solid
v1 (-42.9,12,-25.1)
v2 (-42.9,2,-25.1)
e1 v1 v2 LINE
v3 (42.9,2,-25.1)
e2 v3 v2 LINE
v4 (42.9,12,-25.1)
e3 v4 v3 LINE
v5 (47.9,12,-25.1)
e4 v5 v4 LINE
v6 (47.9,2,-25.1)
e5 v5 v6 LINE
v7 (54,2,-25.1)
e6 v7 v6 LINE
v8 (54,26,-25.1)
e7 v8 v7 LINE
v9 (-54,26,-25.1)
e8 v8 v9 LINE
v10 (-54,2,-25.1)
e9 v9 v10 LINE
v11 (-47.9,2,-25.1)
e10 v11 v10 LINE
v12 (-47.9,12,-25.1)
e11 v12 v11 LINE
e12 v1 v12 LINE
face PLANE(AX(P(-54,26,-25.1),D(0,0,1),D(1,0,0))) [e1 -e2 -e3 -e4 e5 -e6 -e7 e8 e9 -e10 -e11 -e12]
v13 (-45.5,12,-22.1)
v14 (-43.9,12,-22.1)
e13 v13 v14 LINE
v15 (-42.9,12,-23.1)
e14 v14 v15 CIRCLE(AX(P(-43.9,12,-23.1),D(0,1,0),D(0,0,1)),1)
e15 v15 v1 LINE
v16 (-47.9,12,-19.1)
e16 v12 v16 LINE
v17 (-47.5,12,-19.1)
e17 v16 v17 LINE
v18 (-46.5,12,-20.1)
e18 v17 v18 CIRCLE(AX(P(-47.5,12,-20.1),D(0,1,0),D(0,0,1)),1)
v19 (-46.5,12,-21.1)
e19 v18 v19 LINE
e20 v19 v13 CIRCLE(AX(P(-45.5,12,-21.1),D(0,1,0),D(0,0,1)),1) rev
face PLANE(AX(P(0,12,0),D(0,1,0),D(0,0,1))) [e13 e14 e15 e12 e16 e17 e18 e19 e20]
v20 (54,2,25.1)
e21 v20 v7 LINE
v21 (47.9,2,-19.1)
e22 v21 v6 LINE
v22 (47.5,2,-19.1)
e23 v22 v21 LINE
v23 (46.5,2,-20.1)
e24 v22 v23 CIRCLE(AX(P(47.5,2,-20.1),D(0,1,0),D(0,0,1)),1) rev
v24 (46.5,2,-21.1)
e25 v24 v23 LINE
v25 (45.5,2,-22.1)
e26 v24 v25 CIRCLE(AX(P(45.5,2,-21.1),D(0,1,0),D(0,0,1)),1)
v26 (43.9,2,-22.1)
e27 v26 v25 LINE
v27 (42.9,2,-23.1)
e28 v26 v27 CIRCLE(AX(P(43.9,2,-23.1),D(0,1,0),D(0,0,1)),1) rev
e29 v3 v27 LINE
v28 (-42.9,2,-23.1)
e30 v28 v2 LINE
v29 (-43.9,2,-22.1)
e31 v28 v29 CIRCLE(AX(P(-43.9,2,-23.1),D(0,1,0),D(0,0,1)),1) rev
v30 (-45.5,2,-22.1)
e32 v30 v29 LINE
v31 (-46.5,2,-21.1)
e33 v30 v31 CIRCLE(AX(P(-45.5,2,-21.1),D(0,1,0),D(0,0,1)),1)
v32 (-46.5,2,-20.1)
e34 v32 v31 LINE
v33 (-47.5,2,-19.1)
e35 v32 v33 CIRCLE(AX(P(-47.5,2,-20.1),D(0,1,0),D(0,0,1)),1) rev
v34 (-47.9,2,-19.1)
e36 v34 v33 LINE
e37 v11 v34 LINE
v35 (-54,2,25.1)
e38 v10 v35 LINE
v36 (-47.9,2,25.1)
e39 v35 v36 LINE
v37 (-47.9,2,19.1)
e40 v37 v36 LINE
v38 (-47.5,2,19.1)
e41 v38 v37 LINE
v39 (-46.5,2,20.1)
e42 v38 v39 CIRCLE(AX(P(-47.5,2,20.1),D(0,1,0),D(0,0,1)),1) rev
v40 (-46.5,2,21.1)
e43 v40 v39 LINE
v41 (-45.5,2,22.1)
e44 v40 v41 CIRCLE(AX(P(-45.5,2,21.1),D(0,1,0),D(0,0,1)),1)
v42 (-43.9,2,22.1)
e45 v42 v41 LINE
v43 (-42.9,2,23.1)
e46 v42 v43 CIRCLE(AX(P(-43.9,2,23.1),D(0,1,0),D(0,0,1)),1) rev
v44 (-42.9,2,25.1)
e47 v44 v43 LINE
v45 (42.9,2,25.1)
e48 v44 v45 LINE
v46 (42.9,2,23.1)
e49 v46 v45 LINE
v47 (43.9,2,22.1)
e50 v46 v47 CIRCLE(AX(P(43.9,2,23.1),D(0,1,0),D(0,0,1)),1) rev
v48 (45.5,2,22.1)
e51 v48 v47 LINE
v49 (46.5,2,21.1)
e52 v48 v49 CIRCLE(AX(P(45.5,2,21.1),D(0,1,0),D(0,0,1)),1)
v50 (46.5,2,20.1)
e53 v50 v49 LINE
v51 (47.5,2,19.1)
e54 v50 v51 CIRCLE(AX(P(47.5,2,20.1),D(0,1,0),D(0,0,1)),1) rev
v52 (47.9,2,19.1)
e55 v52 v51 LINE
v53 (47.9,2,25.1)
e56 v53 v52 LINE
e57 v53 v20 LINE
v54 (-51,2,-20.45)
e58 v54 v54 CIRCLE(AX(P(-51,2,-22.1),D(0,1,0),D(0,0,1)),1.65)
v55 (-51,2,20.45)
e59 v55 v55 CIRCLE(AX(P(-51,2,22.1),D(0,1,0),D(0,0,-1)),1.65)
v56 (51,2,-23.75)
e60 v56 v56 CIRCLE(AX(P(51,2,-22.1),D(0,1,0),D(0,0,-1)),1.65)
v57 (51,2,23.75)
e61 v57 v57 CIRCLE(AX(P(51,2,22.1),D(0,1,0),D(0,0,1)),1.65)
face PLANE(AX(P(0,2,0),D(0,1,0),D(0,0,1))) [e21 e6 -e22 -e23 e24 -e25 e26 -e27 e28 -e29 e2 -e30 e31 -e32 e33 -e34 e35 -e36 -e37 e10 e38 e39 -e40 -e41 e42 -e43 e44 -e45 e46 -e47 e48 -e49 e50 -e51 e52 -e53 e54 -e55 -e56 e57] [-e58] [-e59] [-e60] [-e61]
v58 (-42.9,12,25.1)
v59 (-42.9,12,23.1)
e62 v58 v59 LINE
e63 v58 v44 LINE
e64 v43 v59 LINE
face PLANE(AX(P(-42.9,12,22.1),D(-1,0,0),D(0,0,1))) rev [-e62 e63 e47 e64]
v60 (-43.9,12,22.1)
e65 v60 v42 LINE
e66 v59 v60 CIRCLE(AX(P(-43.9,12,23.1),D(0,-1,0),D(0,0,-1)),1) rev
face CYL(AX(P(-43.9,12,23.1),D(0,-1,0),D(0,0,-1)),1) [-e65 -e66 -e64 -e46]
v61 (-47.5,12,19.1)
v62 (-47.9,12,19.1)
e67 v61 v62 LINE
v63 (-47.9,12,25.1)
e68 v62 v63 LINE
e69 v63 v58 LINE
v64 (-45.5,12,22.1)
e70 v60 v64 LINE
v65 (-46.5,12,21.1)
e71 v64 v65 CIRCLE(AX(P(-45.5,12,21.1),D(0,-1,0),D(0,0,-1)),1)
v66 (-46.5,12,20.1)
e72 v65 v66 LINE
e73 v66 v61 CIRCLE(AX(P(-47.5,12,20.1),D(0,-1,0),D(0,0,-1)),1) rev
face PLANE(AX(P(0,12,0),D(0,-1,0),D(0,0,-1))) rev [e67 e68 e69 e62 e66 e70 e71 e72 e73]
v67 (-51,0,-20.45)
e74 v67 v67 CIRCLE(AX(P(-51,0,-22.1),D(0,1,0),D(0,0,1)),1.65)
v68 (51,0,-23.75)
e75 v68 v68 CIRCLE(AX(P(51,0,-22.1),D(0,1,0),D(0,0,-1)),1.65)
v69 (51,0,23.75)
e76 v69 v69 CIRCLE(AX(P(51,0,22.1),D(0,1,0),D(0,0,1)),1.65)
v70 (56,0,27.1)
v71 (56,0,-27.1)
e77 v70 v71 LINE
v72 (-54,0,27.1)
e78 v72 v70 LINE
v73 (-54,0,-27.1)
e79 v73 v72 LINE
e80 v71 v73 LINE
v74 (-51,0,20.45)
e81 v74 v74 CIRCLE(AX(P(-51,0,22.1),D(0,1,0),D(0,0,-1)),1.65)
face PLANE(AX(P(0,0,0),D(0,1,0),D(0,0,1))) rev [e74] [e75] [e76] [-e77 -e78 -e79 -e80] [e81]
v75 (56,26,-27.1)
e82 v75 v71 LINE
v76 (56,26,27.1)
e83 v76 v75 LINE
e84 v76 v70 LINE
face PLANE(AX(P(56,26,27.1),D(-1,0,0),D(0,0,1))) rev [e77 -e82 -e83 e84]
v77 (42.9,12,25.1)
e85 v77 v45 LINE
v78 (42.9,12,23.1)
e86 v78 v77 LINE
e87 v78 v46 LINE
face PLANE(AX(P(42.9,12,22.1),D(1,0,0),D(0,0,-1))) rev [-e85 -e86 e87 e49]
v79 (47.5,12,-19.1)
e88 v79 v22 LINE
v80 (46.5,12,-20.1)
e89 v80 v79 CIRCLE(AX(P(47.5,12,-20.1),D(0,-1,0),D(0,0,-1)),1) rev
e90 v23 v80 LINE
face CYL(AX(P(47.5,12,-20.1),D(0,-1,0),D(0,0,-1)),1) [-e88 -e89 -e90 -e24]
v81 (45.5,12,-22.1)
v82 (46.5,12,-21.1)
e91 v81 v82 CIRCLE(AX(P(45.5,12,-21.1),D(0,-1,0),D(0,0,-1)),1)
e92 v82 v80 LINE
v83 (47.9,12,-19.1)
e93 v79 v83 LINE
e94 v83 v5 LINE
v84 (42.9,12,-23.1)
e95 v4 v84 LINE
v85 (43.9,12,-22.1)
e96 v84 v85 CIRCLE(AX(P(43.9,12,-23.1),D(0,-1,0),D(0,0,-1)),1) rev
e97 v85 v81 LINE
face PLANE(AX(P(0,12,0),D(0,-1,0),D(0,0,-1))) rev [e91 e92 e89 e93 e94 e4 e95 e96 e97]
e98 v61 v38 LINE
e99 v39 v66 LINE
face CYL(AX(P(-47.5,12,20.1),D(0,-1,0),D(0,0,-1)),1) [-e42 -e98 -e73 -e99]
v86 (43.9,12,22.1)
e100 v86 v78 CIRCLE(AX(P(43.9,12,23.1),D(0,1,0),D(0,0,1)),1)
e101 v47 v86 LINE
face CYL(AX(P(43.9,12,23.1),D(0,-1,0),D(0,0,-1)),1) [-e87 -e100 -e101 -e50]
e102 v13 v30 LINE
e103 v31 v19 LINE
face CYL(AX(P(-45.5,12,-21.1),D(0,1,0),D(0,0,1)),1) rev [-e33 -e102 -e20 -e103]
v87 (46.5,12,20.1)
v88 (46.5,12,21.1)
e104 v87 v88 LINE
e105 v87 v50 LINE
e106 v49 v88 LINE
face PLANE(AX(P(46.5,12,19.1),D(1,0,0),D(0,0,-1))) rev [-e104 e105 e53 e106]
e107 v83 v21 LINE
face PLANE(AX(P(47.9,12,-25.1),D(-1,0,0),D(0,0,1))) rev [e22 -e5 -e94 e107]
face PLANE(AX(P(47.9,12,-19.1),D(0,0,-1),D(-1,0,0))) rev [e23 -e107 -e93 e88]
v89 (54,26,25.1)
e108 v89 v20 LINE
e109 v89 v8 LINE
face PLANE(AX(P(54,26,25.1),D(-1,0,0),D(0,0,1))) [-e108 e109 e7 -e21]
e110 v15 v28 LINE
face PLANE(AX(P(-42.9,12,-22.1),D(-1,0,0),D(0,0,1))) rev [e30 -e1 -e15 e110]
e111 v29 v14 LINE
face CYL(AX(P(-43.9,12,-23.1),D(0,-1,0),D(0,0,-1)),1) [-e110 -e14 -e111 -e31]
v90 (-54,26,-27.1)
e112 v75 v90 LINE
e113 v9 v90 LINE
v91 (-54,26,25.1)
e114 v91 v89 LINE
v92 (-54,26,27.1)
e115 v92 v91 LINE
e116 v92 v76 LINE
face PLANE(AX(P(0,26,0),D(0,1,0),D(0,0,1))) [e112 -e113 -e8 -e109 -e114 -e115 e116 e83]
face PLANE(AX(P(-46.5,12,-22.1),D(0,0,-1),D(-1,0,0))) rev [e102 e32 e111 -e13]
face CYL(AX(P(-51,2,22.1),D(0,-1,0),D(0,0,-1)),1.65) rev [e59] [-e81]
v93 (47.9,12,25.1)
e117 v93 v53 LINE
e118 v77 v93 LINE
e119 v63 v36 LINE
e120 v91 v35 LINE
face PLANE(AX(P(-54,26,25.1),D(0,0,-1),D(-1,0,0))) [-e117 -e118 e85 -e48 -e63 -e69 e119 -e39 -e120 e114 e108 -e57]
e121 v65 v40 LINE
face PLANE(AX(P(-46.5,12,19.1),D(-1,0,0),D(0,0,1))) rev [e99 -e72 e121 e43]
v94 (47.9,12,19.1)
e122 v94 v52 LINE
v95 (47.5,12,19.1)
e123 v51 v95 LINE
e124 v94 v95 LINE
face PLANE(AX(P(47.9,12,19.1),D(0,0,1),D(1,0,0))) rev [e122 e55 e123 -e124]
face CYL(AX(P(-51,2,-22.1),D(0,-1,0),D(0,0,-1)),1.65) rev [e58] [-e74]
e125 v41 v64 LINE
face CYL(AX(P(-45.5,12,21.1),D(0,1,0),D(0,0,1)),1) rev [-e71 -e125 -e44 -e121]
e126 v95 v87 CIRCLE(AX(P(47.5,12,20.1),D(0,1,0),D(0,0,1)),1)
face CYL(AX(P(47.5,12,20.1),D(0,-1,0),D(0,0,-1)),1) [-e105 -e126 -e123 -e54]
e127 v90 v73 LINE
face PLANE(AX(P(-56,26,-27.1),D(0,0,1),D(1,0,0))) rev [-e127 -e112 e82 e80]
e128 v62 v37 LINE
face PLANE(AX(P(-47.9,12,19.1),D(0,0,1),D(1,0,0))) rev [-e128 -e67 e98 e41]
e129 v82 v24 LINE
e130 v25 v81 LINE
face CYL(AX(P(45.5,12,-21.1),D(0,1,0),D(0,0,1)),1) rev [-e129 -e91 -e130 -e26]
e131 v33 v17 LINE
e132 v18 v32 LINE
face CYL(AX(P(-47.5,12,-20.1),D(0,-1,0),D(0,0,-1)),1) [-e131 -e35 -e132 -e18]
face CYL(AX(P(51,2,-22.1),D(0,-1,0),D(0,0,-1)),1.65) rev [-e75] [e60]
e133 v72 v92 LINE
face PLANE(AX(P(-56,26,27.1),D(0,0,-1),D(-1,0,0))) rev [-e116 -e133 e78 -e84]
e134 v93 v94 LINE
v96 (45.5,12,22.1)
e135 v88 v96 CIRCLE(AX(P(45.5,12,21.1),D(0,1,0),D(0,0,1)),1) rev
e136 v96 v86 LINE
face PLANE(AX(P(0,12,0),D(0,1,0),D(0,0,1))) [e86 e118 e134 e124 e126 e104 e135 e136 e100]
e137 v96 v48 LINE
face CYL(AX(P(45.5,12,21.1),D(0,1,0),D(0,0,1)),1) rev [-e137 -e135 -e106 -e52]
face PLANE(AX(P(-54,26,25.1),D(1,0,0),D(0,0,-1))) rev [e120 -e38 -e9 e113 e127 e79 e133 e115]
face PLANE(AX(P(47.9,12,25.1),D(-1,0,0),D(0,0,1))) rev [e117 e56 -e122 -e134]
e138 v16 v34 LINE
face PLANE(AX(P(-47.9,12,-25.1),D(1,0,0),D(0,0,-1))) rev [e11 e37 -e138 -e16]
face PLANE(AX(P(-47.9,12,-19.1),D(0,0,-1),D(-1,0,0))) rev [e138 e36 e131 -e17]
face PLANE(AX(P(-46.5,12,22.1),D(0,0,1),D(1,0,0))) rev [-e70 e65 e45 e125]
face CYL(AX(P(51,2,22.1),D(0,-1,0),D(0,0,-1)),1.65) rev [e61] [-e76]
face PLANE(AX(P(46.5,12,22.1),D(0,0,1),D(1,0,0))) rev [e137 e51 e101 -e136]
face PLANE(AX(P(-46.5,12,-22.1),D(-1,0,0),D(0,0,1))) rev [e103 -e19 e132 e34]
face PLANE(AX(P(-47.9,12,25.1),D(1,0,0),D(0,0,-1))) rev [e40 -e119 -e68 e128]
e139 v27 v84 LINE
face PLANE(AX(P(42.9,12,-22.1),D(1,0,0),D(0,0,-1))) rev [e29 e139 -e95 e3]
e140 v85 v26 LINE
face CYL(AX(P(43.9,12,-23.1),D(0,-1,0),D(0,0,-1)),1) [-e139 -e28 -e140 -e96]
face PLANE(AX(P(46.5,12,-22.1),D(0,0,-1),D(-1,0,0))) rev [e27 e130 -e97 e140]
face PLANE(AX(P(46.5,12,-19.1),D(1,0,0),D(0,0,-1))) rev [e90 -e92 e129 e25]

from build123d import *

# Parameters (mm, degrees)
SKETCH_1_W          = 112
SKETCH_1_H          = 54.2
SKETCH_1_W_2        = 108
SKETCH_1_H_2        = 50.2
EXTRUDE_1_DEPTH     = 26
SKETCH_2_W          = 108
SKETCH_2_H          = 50.2
SKETCH_2_R          = 1.65
EXTRUDE_2_DEPTH     = 2
EXTRUDE_3_DEPTH     = 10
SKETCH_9_R          = 3.5
SKETCH_9_W          = 20
SKETCH_9_H          = 10
CUT_EXTRUDE_2_DEPTH = 2
FILLET_2_R          = 2
SKETCH_10_W         = 54.2
SKETCH_10_H         = 26
CUT_EXTRUDE_3_DEPTH = 2
FILLET_3_R          = 1


with BuildPart() as part:
    # 草图1 → 凸台-拉伸1 (new body)
    with BuildSketch(Plane(origin=(0, 0, 0), x_dir=(1, 0, 0), z_dir=(0, 1, 0))):
        Rectangle(SKETCH_1_W, SKETCH_1_H)
        Rectangle(SKETCH_1_W_2, SKETCH_1_H_2, mode=Mode.SUBTRACT)
    extrude(amount=EXTRUDE_1_DEPTH)

    # 草图2 → 凸台-拉伸2 (add)
    with BuildSketch(Plane(origin=(0, 0, 0), x_dir=(1, 0, 0), z_dir=(0, 1, 0))):
        Rectangle(SKETCH_2_W, SKETCH_2_H)
        with Locations(Location((-51, 22.1, 0), (0, 0, 270))):
            Circle(SKETCH_2_R, mode=Mode.SUBTRACT)
        with Locations(Location((51, 22.1, 0), (0, 0, 90))):
            Circle(SKETCH_2_R, mode=Mode.SUBTRACT)
        with Locations(Location((51, -22.1, 0), (0, 0, 270))):
            Circle(SKETCH_2_R, mode=Mode.SUBTRACT)
        with Locations(Location((-51, -22.1, 0), (0, 0, 90))):
            Circle(SKETCH_2_R, mode=Mode.SUBTRACT)
    extrude(amount=EXTRUDE_2_DEPTH)

    # 草图6 → 凸台-拉伸3 (add)
    with BuildSketch(Plane(origin=(0, 2, 0), x_dir=(1, 0, 0), z_dir=(0, 1, 0))):
        Polygon((-47.9, 25.1), (-47.9, 19.1), (-46.5, 19.1), (-46.5, 22.1), (-42.9, 22.1), (-42.9, 25.1), align=None)
        Polygon((46.5, 19.1), (46.5, 22.1), (42.9, 22.1), (42.9, 25.1), (47.9, 25.1), (47.9, 19.1), align=None)
        Polygon((47.9, -25.1), (47.9, -19.1), (46.5, -19.1), (46.5, -22.1), (42.9, -22.1), (42.9, -25.1), align=None)
        Polygon((-42.9, -25.1), (-47.9, -25.1), (-47.9, -19.1), (-46.5, -19.1), (-46.5, -22.1), (-42.9, -22.1), align=None)
    extrude(amount=EXTRUDE_3_DEPTH)

    # 草图9 → 切除-拉伸2 (cut)
    with BuildSketch(Plane.ZY.offset(56)):
        with Locations((-16, 6)):
            Circle(SKETCH_9_R)
        with Locations((10.1, 16)):
            Rectangle(SKETCH_9_W, SKETCH_9_H)
    extrude(amount=-CUT_EXTRUDE_2_DEPTH, mode=Mode.SUBTRACT)

    # 圆角2
    fillet_2_edges = [part.edges().sort_by_distance(p)[0] for p in [
        (-56, 16, 20.1),
        (-56, 21, 10.1),
        (-56, 16, 0.1),
        (-56, 11, 10.1),
        (-56, 6, -19.5),
    ]]
    fillet(fillet_2_edges, radius=FILLET_2_R - 0.0001)  # a hair under: the kernel refuses the full size

    # 草图10 → 切除-拉伸3 (cut)
    with BuildSketch(Plane.ZY.offset(56)):
        with Locations((0, 13)):
            Rectangle(SKETCH_10_W, SKETCH_10_H)
    extrude(amount=-CUT_EXTRUDE_3_DEPTH, mode=Mode.SUBTRACT)

    # 圆角3
    fillet_3_edges = [part.edges().sort_by_distance(p)[0] for p in [
        (-42.9, 7, 22.1),
        (-46.5, 7, 22.1),
        (-46.5, 7, 19.1),
        (-46.5, 7, -19.1),
        (-46.5, 7, -22.1),
        (-42.9, 7, -22.1),
        (42.9, 7, -22.1),
        (46.5, 7, -22.1),
        (46.5, 7, -19.1),
        (46.5, 7, 19.1),
        (46.5, 7, 22.1),
        (42.9, 7, 22.1),
    ]]
    fillet(fillet_3_edges, radius=FILLET_3_R)


solid = part.part
